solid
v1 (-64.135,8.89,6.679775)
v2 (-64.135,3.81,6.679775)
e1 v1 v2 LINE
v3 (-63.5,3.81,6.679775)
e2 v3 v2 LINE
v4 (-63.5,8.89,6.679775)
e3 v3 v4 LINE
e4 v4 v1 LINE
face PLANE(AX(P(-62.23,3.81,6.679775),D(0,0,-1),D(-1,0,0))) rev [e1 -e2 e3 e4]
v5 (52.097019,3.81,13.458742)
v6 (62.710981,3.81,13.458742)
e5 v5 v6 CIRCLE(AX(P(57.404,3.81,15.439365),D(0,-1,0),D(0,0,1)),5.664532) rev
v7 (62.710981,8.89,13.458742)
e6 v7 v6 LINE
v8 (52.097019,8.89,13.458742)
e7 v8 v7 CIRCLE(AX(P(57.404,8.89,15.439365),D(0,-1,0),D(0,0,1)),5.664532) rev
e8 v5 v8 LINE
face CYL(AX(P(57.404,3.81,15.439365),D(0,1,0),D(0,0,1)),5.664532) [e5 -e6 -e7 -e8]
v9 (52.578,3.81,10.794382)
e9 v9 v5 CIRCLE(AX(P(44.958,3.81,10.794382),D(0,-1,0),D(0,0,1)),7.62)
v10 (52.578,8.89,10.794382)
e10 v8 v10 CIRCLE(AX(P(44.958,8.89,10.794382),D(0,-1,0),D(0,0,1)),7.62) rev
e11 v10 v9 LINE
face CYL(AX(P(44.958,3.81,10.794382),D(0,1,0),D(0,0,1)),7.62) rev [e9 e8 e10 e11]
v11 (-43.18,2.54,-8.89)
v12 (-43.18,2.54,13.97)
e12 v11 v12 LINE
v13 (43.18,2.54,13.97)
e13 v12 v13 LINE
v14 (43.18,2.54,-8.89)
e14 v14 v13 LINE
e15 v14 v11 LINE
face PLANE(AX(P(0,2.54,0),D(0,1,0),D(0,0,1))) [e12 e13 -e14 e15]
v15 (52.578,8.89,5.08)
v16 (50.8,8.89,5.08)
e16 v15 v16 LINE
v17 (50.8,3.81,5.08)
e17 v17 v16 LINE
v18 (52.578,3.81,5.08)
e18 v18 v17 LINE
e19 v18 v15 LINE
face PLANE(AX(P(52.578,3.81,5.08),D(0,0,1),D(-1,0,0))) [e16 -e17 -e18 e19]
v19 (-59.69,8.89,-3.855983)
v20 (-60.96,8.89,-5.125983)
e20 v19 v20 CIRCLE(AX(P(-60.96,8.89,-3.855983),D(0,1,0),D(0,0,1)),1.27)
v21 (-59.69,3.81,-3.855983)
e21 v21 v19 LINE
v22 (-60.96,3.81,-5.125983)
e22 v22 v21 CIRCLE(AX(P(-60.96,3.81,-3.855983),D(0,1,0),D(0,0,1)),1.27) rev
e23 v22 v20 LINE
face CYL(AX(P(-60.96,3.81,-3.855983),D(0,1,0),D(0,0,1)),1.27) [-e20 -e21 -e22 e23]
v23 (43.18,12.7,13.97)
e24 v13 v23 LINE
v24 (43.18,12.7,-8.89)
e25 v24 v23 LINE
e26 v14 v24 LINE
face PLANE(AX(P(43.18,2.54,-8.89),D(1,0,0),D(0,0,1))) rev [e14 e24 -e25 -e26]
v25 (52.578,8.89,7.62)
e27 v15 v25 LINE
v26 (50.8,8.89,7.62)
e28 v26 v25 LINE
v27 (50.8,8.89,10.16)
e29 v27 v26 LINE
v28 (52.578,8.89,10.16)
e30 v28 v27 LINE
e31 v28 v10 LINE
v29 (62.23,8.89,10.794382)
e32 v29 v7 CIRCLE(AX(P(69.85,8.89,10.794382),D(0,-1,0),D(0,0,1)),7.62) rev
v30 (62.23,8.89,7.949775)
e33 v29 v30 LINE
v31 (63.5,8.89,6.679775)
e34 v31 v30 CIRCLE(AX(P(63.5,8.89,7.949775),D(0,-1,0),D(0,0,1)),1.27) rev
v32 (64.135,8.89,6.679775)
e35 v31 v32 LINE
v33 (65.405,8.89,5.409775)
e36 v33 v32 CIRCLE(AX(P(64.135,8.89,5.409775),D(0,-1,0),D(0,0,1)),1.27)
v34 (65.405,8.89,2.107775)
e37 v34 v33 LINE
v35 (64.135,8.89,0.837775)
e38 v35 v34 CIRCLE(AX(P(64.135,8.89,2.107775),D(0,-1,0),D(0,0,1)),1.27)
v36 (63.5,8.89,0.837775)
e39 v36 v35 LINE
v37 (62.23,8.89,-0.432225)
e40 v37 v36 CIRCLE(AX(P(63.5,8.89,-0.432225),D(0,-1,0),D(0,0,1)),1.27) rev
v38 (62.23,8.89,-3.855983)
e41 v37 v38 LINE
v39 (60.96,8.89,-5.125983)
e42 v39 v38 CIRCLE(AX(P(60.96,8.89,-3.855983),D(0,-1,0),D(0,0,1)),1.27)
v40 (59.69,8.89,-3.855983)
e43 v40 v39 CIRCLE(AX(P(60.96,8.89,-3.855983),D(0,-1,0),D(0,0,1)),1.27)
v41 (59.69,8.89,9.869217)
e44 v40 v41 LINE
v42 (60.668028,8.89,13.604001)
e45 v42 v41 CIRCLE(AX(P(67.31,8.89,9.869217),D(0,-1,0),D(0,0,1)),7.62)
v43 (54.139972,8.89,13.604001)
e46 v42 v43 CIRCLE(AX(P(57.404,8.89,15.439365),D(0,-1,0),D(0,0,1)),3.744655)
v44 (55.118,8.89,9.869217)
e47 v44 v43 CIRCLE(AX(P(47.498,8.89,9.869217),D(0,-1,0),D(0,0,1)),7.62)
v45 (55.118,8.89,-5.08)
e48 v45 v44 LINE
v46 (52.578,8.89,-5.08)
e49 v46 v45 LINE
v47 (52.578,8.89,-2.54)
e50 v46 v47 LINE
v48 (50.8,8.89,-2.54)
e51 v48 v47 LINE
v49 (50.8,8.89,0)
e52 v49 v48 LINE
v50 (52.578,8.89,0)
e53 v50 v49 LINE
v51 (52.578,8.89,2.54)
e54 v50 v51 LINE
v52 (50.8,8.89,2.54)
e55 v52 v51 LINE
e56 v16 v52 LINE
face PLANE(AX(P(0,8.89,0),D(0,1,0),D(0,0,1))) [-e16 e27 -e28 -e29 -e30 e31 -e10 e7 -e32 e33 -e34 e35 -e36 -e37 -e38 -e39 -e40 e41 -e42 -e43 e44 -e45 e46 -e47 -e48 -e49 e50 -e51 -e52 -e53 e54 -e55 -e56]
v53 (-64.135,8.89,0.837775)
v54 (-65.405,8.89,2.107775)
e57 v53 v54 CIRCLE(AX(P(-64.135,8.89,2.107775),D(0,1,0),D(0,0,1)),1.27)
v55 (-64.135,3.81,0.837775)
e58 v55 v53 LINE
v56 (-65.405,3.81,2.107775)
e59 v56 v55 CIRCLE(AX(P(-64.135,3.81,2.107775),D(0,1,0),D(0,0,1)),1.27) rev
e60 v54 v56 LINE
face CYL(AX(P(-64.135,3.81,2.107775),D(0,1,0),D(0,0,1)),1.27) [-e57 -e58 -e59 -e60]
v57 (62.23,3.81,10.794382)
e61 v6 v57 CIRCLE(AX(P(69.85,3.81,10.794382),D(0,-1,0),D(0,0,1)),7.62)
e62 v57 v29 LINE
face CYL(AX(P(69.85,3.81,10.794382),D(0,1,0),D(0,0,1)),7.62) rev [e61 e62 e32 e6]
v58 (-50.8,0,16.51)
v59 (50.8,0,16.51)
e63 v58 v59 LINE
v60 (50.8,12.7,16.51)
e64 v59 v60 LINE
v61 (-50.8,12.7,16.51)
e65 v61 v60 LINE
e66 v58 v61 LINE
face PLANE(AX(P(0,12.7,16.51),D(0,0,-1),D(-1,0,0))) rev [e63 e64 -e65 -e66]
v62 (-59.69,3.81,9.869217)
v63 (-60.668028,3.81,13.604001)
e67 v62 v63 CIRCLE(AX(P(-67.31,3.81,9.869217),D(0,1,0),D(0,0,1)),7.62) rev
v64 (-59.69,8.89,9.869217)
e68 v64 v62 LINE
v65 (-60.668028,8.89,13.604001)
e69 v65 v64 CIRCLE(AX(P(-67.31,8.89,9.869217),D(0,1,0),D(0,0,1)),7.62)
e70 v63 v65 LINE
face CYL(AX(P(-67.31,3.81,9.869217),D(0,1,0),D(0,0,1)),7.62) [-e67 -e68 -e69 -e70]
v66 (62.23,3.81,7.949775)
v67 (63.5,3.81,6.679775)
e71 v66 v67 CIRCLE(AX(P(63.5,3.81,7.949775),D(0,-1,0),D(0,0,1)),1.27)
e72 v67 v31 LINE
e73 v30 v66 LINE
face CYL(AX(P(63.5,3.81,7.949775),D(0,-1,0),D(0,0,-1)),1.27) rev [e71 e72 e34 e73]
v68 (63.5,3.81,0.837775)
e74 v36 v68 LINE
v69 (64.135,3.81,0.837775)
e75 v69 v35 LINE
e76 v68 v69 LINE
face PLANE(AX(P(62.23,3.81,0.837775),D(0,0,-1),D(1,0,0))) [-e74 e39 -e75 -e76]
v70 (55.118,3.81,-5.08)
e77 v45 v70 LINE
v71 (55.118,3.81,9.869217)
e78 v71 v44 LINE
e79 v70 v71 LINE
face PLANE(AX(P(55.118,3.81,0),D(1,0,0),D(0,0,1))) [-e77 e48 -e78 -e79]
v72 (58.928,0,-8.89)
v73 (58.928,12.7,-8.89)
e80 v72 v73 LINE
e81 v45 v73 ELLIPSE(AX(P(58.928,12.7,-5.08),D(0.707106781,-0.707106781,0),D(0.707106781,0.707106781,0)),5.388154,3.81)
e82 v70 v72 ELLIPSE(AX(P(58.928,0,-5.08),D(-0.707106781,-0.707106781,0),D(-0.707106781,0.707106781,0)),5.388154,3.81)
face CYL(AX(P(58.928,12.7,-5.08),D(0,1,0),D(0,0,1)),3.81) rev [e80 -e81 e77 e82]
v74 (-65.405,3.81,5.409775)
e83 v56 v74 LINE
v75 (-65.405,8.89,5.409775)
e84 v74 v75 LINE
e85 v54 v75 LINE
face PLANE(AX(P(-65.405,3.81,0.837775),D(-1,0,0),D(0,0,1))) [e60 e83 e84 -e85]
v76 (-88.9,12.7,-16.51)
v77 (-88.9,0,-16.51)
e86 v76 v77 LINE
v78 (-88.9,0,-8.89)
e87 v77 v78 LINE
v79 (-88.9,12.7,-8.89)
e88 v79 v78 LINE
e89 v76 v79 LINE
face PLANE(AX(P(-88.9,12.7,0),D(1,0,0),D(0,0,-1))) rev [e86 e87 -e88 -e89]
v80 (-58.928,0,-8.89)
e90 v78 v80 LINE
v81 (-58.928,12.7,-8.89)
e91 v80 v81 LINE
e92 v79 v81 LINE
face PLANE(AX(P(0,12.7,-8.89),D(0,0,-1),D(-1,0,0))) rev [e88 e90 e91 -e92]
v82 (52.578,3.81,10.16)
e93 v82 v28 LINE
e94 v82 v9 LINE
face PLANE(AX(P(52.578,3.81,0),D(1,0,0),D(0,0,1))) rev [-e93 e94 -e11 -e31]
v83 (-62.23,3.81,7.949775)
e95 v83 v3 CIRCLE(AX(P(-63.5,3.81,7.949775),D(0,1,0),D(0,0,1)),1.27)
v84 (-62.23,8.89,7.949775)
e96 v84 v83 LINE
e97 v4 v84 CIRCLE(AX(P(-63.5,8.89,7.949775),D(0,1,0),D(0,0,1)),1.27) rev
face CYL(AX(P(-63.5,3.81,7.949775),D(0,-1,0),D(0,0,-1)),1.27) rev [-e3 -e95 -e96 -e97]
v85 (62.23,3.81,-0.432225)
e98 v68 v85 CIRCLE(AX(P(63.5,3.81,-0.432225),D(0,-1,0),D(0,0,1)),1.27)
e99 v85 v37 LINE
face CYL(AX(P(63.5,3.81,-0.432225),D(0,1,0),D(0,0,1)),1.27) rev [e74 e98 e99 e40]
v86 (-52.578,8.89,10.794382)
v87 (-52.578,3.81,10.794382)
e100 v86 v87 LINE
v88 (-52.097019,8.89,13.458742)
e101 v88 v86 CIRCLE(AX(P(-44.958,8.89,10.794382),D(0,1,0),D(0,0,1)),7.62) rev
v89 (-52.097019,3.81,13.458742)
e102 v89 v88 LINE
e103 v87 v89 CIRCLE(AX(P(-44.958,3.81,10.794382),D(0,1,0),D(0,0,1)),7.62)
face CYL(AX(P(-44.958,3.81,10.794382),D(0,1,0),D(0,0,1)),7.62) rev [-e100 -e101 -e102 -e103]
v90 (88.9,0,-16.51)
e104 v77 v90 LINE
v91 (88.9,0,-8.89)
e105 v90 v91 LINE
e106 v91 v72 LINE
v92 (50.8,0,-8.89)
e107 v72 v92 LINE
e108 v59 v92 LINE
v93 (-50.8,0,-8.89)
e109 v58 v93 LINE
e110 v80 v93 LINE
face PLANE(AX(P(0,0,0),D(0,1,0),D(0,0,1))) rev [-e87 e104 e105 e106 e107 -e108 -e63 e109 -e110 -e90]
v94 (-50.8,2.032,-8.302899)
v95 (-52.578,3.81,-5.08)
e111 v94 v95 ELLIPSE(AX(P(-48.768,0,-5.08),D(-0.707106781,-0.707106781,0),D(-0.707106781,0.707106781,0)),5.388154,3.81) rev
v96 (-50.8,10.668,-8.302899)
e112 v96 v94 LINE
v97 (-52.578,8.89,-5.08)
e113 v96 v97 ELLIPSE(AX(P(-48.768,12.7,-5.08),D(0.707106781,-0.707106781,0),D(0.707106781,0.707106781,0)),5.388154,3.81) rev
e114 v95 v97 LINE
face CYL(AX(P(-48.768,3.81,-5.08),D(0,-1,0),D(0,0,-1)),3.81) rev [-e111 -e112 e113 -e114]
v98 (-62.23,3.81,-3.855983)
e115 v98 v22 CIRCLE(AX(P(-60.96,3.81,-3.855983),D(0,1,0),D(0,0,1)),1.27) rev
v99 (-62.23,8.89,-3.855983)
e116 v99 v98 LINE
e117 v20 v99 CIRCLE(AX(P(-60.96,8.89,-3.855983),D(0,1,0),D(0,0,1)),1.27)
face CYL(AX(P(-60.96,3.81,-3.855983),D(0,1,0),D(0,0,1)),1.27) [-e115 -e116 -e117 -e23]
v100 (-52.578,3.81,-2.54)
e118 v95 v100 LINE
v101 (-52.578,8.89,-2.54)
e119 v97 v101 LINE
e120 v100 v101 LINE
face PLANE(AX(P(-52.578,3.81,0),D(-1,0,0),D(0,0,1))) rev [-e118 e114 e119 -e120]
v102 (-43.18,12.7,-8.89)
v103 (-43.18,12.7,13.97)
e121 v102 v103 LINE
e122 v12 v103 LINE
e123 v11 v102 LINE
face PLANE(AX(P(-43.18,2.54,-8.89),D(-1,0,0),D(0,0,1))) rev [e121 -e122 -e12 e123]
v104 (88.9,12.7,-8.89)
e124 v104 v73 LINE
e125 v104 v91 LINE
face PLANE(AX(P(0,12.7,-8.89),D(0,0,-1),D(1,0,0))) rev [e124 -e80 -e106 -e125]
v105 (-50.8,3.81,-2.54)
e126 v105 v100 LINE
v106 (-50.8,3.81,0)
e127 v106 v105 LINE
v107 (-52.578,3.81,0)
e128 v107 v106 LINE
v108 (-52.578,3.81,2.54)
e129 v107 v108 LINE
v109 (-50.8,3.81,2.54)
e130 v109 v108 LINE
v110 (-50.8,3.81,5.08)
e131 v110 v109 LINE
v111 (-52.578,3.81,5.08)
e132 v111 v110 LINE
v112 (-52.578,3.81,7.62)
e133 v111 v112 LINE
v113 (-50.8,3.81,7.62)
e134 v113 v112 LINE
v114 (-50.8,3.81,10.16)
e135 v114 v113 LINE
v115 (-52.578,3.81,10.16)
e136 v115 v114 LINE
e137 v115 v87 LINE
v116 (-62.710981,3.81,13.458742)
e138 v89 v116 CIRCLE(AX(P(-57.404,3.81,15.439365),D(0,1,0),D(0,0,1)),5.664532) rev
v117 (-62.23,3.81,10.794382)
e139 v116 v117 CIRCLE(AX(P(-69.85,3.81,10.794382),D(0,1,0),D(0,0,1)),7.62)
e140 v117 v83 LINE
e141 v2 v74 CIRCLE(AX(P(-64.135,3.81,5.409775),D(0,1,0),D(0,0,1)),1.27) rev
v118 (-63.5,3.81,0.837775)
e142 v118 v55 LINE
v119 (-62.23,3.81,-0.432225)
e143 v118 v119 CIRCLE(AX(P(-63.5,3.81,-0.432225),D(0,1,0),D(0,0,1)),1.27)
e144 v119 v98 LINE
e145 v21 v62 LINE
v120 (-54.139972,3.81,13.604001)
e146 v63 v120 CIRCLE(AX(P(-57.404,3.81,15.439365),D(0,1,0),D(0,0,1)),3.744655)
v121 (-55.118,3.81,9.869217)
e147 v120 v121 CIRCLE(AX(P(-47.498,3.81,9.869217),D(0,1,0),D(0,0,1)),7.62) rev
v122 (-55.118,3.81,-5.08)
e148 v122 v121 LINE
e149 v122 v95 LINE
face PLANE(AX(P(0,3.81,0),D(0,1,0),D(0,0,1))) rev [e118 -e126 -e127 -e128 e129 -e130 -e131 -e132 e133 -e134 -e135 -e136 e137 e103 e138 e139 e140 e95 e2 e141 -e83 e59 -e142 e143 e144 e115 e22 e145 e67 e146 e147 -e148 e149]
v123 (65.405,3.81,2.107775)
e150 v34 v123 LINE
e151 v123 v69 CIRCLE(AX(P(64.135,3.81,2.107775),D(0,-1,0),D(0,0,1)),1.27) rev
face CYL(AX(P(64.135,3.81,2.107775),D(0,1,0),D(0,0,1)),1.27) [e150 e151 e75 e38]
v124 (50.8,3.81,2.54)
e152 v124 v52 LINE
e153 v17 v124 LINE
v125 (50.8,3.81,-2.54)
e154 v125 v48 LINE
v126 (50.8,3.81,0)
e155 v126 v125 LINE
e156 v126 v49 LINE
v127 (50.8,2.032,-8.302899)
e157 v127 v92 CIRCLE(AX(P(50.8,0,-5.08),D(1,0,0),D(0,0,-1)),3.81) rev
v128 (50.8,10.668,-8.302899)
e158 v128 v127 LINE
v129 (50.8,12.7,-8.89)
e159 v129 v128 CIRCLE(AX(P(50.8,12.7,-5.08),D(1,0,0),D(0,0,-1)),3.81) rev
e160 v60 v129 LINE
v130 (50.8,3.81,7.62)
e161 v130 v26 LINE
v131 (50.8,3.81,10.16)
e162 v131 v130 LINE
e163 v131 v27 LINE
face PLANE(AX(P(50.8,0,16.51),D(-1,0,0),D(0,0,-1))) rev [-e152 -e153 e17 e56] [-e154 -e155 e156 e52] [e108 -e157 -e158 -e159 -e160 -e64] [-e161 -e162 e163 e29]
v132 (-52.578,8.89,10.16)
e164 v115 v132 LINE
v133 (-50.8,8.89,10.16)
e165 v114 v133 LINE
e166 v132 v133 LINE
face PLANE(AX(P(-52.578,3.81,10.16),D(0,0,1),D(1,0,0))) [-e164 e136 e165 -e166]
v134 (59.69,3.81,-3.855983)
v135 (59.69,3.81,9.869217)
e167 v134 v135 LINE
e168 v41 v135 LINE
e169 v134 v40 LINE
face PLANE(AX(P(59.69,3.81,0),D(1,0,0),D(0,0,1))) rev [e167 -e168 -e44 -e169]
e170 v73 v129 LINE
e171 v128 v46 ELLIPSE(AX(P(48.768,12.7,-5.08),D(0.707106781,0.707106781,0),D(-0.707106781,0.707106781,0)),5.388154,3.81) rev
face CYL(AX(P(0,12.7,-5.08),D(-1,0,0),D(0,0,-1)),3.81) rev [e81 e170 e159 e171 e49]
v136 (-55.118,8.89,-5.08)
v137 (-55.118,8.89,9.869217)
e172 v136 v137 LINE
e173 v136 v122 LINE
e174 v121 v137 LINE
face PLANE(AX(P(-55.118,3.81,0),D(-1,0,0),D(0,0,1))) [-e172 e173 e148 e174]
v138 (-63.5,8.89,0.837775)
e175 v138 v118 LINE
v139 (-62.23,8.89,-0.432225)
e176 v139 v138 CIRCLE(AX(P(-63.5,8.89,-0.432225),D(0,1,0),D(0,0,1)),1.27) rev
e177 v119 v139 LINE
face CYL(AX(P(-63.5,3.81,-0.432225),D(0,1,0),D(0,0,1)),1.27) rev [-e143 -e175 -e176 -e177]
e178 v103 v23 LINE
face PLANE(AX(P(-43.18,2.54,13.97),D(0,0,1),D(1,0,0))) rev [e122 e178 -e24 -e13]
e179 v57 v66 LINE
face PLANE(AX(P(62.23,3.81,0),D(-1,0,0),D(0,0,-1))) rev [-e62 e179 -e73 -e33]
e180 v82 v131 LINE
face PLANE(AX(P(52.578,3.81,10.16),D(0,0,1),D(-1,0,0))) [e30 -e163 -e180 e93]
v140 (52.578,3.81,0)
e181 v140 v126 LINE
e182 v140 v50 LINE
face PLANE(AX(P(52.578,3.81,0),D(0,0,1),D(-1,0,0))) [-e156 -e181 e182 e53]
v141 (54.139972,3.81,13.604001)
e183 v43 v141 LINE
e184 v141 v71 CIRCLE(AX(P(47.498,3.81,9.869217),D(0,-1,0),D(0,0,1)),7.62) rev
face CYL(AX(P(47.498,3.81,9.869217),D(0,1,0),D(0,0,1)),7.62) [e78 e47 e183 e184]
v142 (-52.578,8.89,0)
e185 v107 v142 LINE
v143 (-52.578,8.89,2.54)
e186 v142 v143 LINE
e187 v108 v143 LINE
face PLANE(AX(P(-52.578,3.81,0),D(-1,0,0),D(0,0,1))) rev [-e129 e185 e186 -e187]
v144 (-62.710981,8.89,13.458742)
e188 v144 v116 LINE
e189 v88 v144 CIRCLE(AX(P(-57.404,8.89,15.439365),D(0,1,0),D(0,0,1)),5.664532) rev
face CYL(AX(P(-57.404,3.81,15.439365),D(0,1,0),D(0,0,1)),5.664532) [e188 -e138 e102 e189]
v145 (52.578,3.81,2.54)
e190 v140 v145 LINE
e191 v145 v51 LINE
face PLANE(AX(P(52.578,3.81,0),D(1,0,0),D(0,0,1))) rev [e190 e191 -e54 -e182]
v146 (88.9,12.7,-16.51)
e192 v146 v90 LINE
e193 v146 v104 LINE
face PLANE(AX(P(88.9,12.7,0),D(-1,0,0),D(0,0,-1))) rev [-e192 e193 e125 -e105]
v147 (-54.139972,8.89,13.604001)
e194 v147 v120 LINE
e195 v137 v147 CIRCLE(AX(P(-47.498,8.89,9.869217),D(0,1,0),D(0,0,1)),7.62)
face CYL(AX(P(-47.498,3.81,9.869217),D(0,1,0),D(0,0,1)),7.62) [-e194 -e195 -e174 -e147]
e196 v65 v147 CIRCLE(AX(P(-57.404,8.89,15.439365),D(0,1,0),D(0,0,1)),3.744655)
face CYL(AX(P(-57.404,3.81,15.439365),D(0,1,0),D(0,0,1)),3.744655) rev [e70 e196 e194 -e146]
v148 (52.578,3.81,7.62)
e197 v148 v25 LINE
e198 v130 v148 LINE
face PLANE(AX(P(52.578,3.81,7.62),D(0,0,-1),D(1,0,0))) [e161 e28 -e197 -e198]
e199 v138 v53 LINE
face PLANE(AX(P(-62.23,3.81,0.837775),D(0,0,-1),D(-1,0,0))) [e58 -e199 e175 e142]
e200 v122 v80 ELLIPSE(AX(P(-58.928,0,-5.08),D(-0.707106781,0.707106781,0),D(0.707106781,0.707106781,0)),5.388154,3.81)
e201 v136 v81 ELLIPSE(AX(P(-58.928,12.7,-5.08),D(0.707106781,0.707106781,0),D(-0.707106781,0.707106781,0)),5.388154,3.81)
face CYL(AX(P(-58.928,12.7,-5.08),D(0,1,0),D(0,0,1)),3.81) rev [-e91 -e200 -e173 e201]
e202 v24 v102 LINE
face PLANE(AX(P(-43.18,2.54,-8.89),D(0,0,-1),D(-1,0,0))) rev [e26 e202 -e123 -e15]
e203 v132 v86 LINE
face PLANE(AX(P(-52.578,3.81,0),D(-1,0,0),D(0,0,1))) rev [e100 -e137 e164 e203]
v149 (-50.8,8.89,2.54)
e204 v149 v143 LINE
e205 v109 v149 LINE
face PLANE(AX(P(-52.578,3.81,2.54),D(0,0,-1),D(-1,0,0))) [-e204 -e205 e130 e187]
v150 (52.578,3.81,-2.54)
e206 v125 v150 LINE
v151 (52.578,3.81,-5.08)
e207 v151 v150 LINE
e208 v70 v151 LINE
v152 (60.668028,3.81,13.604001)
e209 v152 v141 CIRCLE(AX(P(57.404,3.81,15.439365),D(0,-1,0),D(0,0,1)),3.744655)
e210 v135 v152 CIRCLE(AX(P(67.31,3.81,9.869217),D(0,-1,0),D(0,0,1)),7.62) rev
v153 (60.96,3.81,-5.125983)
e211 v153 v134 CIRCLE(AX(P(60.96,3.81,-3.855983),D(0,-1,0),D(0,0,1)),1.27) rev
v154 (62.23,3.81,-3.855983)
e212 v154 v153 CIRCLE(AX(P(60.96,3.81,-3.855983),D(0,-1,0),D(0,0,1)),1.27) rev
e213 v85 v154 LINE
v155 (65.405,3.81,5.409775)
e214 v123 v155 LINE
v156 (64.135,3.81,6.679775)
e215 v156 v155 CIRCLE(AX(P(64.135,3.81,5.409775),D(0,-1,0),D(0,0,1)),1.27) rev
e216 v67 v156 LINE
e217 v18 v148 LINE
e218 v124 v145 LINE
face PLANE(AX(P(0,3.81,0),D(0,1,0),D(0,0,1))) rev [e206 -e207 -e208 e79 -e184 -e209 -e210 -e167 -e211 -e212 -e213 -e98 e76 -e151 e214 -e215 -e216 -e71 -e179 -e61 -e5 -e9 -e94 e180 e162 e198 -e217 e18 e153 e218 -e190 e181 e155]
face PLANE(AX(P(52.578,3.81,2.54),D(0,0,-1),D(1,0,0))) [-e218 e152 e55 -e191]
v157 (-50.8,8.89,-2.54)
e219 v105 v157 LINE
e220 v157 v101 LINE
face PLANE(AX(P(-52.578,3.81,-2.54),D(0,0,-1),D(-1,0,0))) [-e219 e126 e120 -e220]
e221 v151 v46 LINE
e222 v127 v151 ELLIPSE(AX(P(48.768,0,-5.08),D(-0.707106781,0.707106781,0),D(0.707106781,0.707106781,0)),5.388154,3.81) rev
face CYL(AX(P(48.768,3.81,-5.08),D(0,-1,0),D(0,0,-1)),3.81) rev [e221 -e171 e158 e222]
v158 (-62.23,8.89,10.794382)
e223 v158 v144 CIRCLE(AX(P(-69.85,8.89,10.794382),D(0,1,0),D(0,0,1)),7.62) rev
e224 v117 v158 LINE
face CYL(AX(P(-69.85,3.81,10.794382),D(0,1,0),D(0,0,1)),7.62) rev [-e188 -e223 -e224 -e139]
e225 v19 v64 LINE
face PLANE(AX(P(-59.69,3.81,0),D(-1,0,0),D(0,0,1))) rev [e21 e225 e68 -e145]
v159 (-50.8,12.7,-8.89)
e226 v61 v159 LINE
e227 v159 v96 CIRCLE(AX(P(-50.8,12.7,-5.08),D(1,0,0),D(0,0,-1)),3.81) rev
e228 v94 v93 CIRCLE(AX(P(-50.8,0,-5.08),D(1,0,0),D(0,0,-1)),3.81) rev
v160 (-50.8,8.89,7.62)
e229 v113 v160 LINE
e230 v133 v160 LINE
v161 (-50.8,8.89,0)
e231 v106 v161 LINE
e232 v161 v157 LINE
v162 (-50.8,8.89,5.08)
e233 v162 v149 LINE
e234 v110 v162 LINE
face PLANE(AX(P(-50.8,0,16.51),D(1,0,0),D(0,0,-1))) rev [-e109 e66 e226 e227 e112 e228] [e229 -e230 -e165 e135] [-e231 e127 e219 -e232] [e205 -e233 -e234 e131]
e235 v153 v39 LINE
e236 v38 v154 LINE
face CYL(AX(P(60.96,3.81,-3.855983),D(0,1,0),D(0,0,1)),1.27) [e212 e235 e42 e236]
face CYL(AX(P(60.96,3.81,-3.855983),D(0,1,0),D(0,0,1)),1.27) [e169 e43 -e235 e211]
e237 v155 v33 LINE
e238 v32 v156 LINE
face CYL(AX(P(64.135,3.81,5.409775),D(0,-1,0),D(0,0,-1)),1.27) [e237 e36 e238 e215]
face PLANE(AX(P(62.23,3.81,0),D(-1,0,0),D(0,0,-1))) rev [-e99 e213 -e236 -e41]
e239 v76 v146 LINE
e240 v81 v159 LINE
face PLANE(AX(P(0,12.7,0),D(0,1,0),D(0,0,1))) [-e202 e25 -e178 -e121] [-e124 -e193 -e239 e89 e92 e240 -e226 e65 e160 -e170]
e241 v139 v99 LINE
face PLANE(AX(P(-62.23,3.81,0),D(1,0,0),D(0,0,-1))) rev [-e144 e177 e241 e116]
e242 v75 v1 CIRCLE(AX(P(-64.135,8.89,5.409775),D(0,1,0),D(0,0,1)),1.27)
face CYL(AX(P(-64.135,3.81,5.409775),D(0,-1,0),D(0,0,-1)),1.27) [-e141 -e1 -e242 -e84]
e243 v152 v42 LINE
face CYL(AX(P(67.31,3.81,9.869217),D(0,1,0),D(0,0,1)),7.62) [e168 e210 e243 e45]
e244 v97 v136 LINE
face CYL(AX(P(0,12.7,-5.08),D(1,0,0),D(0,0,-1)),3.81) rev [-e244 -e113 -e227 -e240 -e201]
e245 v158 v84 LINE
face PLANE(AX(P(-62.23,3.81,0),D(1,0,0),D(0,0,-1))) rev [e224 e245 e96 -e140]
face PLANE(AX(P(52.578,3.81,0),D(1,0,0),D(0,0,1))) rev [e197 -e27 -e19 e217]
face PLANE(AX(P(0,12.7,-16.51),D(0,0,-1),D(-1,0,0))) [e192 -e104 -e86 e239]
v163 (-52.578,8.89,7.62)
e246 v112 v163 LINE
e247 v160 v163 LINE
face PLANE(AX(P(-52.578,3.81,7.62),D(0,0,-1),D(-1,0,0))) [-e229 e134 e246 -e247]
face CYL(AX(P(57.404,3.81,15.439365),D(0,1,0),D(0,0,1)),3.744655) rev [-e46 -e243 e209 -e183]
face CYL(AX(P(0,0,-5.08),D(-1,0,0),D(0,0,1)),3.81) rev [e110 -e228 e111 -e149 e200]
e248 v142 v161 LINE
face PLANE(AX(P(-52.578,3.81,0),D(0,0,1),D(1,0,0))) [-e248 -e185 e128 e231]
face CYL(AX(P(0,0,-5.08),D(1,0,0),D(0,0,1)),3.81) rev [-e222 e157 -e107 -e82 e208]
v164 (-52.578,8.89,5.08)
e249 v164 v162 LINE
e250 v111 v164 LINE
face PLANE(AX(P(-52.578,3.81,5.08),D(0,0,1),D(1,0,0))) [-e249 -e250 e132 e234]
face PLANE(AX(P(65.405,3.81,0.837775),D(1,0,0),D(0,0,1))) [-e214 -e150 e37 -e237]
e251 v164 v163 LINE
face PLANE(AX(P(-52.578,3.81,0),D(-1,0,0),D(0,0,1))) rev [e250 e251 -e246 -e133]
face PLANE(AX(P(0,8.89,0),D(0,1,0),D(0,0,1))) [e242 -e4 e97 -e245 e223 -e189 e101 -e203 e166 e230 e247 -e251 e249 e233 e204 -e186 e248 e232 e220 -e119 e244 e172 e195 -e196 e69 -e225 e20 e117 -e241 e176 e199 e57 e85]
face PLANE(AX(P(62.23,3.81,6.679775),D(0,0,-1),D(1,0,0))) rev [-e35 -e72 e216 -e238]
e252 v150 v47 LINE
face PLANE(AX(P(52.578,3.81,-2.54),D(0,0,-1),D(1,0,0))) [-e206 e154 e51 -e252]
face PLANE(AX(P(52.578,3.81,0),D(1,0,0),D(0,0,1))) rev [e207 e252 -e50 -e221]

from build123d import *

# Parameters (mm, degrees)
BOSS_EXTRUDE1_DEPTH = 12.7
SKETCH6_W           = 86.36
SKETCH6_H           = 22.86
CUT_EXTRUDE3_DEPTH  = 10.16
SKETCH7_W           = 12.7
SKETCH7_H           = 25.4
CUT_EXTRUDE4_DEPTH  = 12.7
SKETCH14_W          = 88.9
SKETCH14_H          = 33.02
CUT_EXTRUDE5_DEPTH  = 19.558
BOSS_EXTRUDE2_START = -3.81
SKETCH15_W          = 2.54
SKETCH15_H          = 21.363451449
SKETCH15_W_2        = 3.175
SKETCH15_H_2        = 5.842
BOSS_EXTRUDE2_DEPTH = 5.08
FILLET1_R           = 7.62
FILLET2_R           = 1.27
FILLET3_R           = 3.81
BOSS_EXTRUDE3_START = -3.81
SKETCH16_W          = 1.778
SKETCH16_H          = 2.54
BOSS_EXTRUDE3_DEPTH = 5.08


# Some blends are built 0.0001 mm under size
with BuildPart() as part:
    # Sketch1 → Boss-Extrude1 (new body)
    with BuildSketch(Plane(origin=(0, 0, 0), x_dir=(1, 0, 0), z_dir=(0, 1, 0))):
        Polygon((88.9, 16.51), (-88.9, 16.51), (-88.9, 8.89), (-63.5, 8.89), (-63.5, -16.51), (63.5, -16.51), (63.5, 8.89), (88.9, 8.89), align=None)
    extrude(amount=BOSS_EXTRUDE1_DEPTH)

    # Sketch6 → Cut-Extrude3 (cut)
    with BuildSketch(Plane(origin=(0, 12.7, 0), x_dir=(1, 0, 0), z_dir=(0, 1, 0))):
        with Locations((0, -2.54)):
            Rectangle(SKETCH6_W, SKETCH6_H)
    extrude(amount=-CUT_EXTRUDE3_DEPTH, mode=Mode.SUBTRACT)

    # Sketch7 → Cut-Extrude4 (cut)
    with BuildSketch(Plane(origin=(0, 12.7, 0), x_dir=(1, 0, 0), z_dir=(0, 1, 0))):
        with Locations((57.15, -3.81)):
            Rectangle(SKETCH7_W, SKETCH7_H)
        with Locations((-57.15, -3.81)):
            Rectangle(SKETCH7_W, SKETCH7_H)
    extrude(amount=-CUT_EXTRUDE4_DEPTH, mode=Mode.SUBTRACT)

    # Sketch14 → Cut-Extrude5 (cut)
    with BuildSketch(Plane(origin=(0, 12.7, 0), x_dir=(1, 0, 0), z_dir=(0, 1, 0))):
        with Locations((44.45, 0)):
            Rectangle(SKETCH14_W, SKETCH14_H)
    extrude(amount=-CUT_EXTRUDE5_DEPTH, mode=Mode.SUBTRACT)

    # Sketch15 → Boss-Extrude2 (add)
    with BuildSketch(Plane(origin=(0, 12.7, 0), x_dir=(1, 0, 0), z_dir=(0, 1, 0)).offset(BOSS_EXTRUDE2_START)):
        with Locations((-53.848, -1.791725725)):
            Rectangle(SKETCH15_W, SKETCH15_H)
        with BuildLine():
            ThreePointArc((-59.69, -12.473451449), (-57.404, -19.184020308), (-55.118, -12.473451449))
            Line((-55.118, -12.473451449), (-52.578, -12.473451449))
            ThreePointArc((-52.578, -12.473451449), (-57.404, -21.103897158), (-62.23, -12.473451449))
            Line((-62.23, -12.473451449), (-62.23, 5.125982646))
            Line((-62.23, 5.125982646), (-59.69, 5.125982646))
            Line((-59.69, 5.125982646), (-59.69, -12.473451449))
        make_face()
        with Locations((-63.8175, -3.758774926)):
            Rectangle(SKETCH15_W_2, SKETCH15_H_2)
    extrude(amount=-BOSS_EXTRUDE2_DEPTH)

    # Fillet1
    fillet1_edges = [part.edges().sort_by_distance(p)[0] for p in [
        (-59.69, 6.35, 12.473451449),
        (-55.118, 6.35, 12.473451449),
        (-62.23, 6.35, 12.473451449),
        (-52.578, 6.35, 12.473451449),
    ]]
    fillet(fillet1_edges, radius=FILLET1_R)

    # Fillet2
    fillet2_edges = [part.edges().sort_by_distance(p)[0] for p in [
        (-62.23, 6.35, 6.679774926),
        (-65.405, 6.35, 6.679774926),
        (-65.405, 6.35, 0.837774926),
        (-62.23, 6.35, 0.837774926),
        (-59.69, 6.35, -5.125982646),
        (-62.23, 6.35, -5.125982646),
    ]]
    fillet(fillet2_edges, radius=FILLET2_R - 0.0001)  # a hair under: the kernel refuses the full size

    # Fillet3
    # the kernel refuses this fillet: 3.81 mm, written as the material it adds along each edge
    with BuildSketch(Plane(origin=(-52.578, 8.89, -8.89), x_dir=(0, 0, 1), z_dir=(0, -1, 0)), Plane(origin=(-55.118, 8.89, -8.89), x_dir=(-1, 0, 0), z_dir=(0, -1, 0))) as fillet3_piece_1:
        with BuildLine():
            CenterArc((FILLET3_R, -FILLET3_R), FILLET3_R, 90, 90)
            Line((0, -FILLET3_R), (-FILLET3_R * 0.02, -FILLET3_R))
            Line((-FILLET3_R * 0.02, -FILLET3_R), (-FILLET3_R * 0.02, FILLET3_R * 0.02))
            Line((-FILLET3_R * 0.02, FILLET3_R * 0.02), (FILLET3_R, FILLET3_R * 0.02))
            Line((FILLET3_R, FILLET3_R * 0.02), (FILLET3_R, 0))
        make_face()
    extrude(amount=5.08)
    with BuildSketch(Plane(origin=(-52.578, 3.81, -8.89), x_dir=(0, -1, 0), z_dir=(-1, 0, 0)), Plane(origin=(-52.578, 8.89, -8.89), x_dir=(0, 0, 1), z_dir=(-1, 0, 0))) as fillet3_piece_2:
        with BuildLine():
            CenterArc((FILLET3_R, FILLET3_R), FILLET3_R, 180, 90)
            Line((0, FILLET3_R), (-FILLET3_R * 0.02, FILLET3_R))
            Line((-FILLET3_R * 0.02, FILLET3_R), (-FILLET3_R * 0.02, -FILLET3_R * 0.02))
            Line((-FILLET3_R * 0.02, -FILLET3_R * 0.02), (FILLET3_R, -FILLET3_R * 0.02))
            Line((FILLET3_R, -FILLET3_R * 0.02), (FILLET3_R, 0))
        make_face()
    extrude(amount=2.54)
    with BuildSketch(Plane(origin=(-43.053, 8.89, -8.89), x_dir=(0, 0, 1), z_dir=(-1, 0, 0))) as fillet3_piece_3a_section:
        with BuildLine():
            CenterArc((FILLET3_R, FILLET3_R), FILLET3_R, 180, 90)
            Line((0, FILLET3_R), (-FILLET3_R * 0.02, FILLET3_R))
            Line((-FILLET3_R * 0.02, FILLET3_R), (-FILLET3_R * 0.02, -FILLET3_R * 0.02))
            Line((-FILLET3_R * 0.02, -FILLET3_R * 0.02), (FILLET3_R, -FILLET3_R * 0.02))
            Line((FILLET3_R, -FILLET3_R * 0.02), (FILLET3_R, 0))
        make_face()
    fillet3_piece_3a = extrude(amount=12.065, mode=Mode.PRIVATE)
    fillet3_piece_3a = split(fillet3_piece_3a, bisect_by=Plane(origin=(-52.578, 9.752565385, -8.027434615), z_dir=(1, 0, 0)), keep=Keep.TOP, mode=Mode.PRIVATE)
    with BuildSketch(Plane(origin=(-52.578, 18.415, -8.89), x_dir=(0, 0, 1), z_dir=(0, -1, 0))) as fillet3_piece_3b_section:
        with BuildLine():
            CenterArc((FILLET3_R, -FILLET3_R), FILLET3_R, 90, 90)
            Line((0, -FILLET3_R), (-FILLET3_R * 0.02, -FILLET3_R))
            Line((-FILLET3_R * 0.02, -FILLET3_R), (-FILLET3_R * 0.02, FILLET3_R * 0.02))
            Line((-FILLET3_R * 0.02, FILLET3_R * 0.02), (FILLET3_R, FILLET3_R * 0.02))
            Line((FILLET3_R, FILLET3_R * 0.02), (FILLET3_R, 0))
        make_face()
    fillet3_piece_3b = extrude(amount=14.605, mode=Mode.PRIVATE)
    fillet3_piece_3b = split(fillet3_piece_3b, bisect_by=Plane(origin=(-51.715434615, 8.89, -8.027434615), z_dir=(0, 1, 0)), keep=Keep.TOP, mode=Mode.PRIVATE)
    fillet3_piece_3 = fillet3_piece_3a & fillet3_piece_3b
    add(fillet3_piece_3)
    with BuildSketch(Plane(origin=(-52.578, 8.89, -8.89), x_dir=(0, 0, 1), z_dir=(0, -1, 0))) as fillet3_piece_4a_section:
        with BuildLine():
            CenterArc((FILLET3_R, -FILLET3_R), FILLET3_R, 90, 90)
            Line((0, -FILLET3_R), (-FILLET3_R * 0.02, -FILLET3_R))
            Line((-FILLET3_R * 0.02, -FILLET3_R), (-FILLET3_R * 0.02, FILLET3_R * 0.02))
            Line((-FILLET3_R * 0.02, FILLET3_R * 0.02), (FILLET3_R, FILLET3_R * 0.02))
            Line((FILLET3_R, FILLET3_R * 0.02), (FILLET3_R, 0))
        make_face()
    fillet3_piece_4a = extrude(amount=14.605, mode=Mode.PRIVATE)
    fillet3_piece_4a = split(fillet3_piece_4a, bisect_by=Plane(origin=(-51.715434615, 3.81, -8.027434615), z_dir=(0, -1, 0)), keep=Keep.TOP, mode=Mode.PRIVATE)
    with BuildSketch(Plane(origin=(-43.053, 3.81, -8.89), x_dir=(0, -1, 0), z_dir=(-1, 0, 0))) as fillet3_piece_4b_section:
        with BuildLine():
            CenterArc((FILLET3_R, FILLET3_R), FILLET3_R, 180, 90)
            Line((0, FILLET3_R), (-FILLET3_R * 0.02, FILLET3_R))
            Line((-FILLET3_R * 0.02, FILLET3_R), (-FILLET3_R * 0.02, -FILLET3_R * 0.02))
            Line((-FILLET3_R * 0.02, -FILLET3_R * 0.02), (FILLET3_R, -FILLET3_R * 0.02))
            Line((FILLET3_R, -FILLET3_R * 0.02), (FILLET3_R, 0))
        make_face()
    fillet3_piece_4b = extrude(amount=12.065, mode=Mode.PRIVATE)
    fillet3_piece_4b = split(fillet3_piece_4b, bisect_by=Plane(origin=(-52.578, 2.947434615, -8.027434615), z_dir=(1, 0, 0)), keep=Keep.TOP, mode=Mode.PRIVATE)
    fillet3_piece_4 = fillet3_piece_4a & fillet3_piece_4b
    add(fillet3_piece_4)
    with BuildSketch(Plane(origin=(-52.578, 8.89, -8.89), x_dir=(0, 0, 1), z_dir=(-1, 0, 0))) as fillet3_piece_5a_section:
        with BuildLine():
            CenterArc((FILLET3_R, FILLET3_R), FILLET3_R, 180, 90)
            Line((0, FILLET3_R), (-FILLET3_R * 0.02, FILLET3_R))
            Line((-FILLET3_R * 0.02, FILLET3_R), (-FILLET3_R * 0.02, -FILLET3_R * 0.02))
            Line((-FILLET3_R * 0.02, -FILLET3_R * 0.02), (FILLET3_R, -FILLET3_R * 0.02))
            Line((FILLET3_R, -FILLET3_R * 0.02), (FILLET3_R, 0))
        make_face()
    fillet3_piece_5a = extrude(amount=12.065, mode=Mode.PRIVATE)
    fillet3_piece_5a = split(fillet3_piece_5a, bisect_by=Plane(origin=(-55.118, 9.752565385, -8.027434615), z_dir=(-1, 0, 0)), keep=Keep.TOP, mode=Mode.PRIVATE)
    with BuildSketch(Plane(origin=(-55.118, 18.415, -8.89), x_dir=(-1, 0, 0), z_dir=(0, -1, 0))) as fillet3_piece_5b_section:
        with BuildLine():
            CenterArc((FILLET3_R, -FILLET3_R), FILLET3_R, 90, 90)
            Line((0, -FILLET3_R), (-FILLET3_R * 0.02, -FILLET3_R))
            Line((-FILLET3_R * 0.02, -FILLET3_R), (-FILLET3_R * 0.02, FILLET3_R * 0.02))
            Line((-FILLET3_R * 0.02, FILLET3_R * 0.02), (FILLET3_R, FILLET3_R * 0.02))
            Line((FILLET3_R, FILLET3_R * 0.02), (FILLET3_R, 0))
        make_face()
    fillet3_piece_5b = extrude(amount=14.605, mode=Mode.PRIVATE)
    fillet3_piece_5b = split(fillet3_piece_5b, bisect_by=Plane(origin=(-55.980565385, 8.89, -8.027434615), z_dir=(0, 1, 0)), keep=Keep.TOP, mode=Mode.PRIVATE)
    fillet3_piece_5 = fillet3_piece_5a & fillet3_piece_5b
    add(fillet3_piece_5)
    with BuildSketch(Plane(origin=(-52.578, 3.81, -8.89), x_dir=(0, -1, 0), z_dir=(-1, 0, 0))) as fillet3_piece_6a_section:
        with BuildLine():
            CenterArc((FILLET3_R, FILLET3_R), FILLET3_R, 180, 90)
            Line((0, FILLET3_R), (-FILLET3_R * 0.02, FILLET3_R))
            Line((-FILLET3_R * 0.02, FILLET3_R), (-FILLET3_R * 0.02, -FILLET3_R * 0.02))
            Line((-FILLET3_R * 0.02, -FILLET3_R * 0.02), (FILLET3_R, -FILLET3_R * 0.02))
            Line((FILLET3_R, -FILLET3_R * 0.02), (FILLET3_R, 0))
        make_face()
    fillet3_piece_6a = extrude(amount=12.065, mode=Mode.PRIVATE)
    fillet3_piece_6a = split(fillet3_piece_6a, bisect_by=Plane(origin=(-55.118, 2.947434615, -8.027434615), z_dir=(-1, 0, 0)), keep=Keep.TOP, mode=Mode.PRIVATE)
    with BuildSketch(Plane(origin=(-55.118, 8.89, -8.89), x_dir=(-1, 0, 0), z_dir=(0, -1, 0))) as fillet3_piece_6b_section:
        with BuildLine():
            CenterArc((FILLET3_R, -FILLET3_R), FILLET3_R, 90, 90)
            Line((0, -FILLET3_R), (-FILLET3_R * 0.02, -FILLET3_R))
            Line((-FILLET3_R * 0.02, -FILLET3_R), (-FILLET3_R * 0.02, FILLET3_R * 0.02))
            Line((-FILLET3_R * 0.02, FILLET3_R * 0.02), (FILLET3_R, FILLET3_R * 0.02))
            Line((FILLET3_R, FILLET3_R * 0.02), (FILLET3_R, 0))
        make_face()
    fillet3_piece_6b = extrude(amount=14.605, mode=Mode.PRIVATE)
    fillet3_piece_6b = split(fillet3_piece_6b, bisect_by=Plane(origin=(-55.980565385, 3.81, -8.027434615), z_dir=(0, -1, 0)), keep=Keep.TOP, mode=Mode.PRIVATE)
    fillet3_piece_6 = fillet3_piece_6a & fillet3_piece_6b
    add(fillet3_piece_6)

    # Sketch16 → Boss-Extrude3 (add)
    with BuildSketch(Plane(origin=(0, 12.7, 0), x_dir=(1, 0, 0), z_dir=(0, 1, 0)).offset(BOSS_EXTRUDE3_START)):
        with Locations((-51.689, 1.27)):
            Rectangle(SKETCH16_W, SKETCH16_H)
        with Locations((-51.689, -3.81)):
            Rectangle(SKETCH16_W, SKETCH16_H)
        with Locations((-51.689, -8.89)):
            Rectangle(SKETCH16_W, SKETCH16_H)
    extrude(amount=-BOSS_EXTRUDE3_DEPTH)

    # Mirror1: part across plane


with BuildPart() as part_1:
    add(part.part)
    add(part.part.mirror(Plane(origin=(0, -6.858, -16.51), x_dir=(0, 0, 1), z_dir=(-1, 0, 0))))


solid = part_1.part
